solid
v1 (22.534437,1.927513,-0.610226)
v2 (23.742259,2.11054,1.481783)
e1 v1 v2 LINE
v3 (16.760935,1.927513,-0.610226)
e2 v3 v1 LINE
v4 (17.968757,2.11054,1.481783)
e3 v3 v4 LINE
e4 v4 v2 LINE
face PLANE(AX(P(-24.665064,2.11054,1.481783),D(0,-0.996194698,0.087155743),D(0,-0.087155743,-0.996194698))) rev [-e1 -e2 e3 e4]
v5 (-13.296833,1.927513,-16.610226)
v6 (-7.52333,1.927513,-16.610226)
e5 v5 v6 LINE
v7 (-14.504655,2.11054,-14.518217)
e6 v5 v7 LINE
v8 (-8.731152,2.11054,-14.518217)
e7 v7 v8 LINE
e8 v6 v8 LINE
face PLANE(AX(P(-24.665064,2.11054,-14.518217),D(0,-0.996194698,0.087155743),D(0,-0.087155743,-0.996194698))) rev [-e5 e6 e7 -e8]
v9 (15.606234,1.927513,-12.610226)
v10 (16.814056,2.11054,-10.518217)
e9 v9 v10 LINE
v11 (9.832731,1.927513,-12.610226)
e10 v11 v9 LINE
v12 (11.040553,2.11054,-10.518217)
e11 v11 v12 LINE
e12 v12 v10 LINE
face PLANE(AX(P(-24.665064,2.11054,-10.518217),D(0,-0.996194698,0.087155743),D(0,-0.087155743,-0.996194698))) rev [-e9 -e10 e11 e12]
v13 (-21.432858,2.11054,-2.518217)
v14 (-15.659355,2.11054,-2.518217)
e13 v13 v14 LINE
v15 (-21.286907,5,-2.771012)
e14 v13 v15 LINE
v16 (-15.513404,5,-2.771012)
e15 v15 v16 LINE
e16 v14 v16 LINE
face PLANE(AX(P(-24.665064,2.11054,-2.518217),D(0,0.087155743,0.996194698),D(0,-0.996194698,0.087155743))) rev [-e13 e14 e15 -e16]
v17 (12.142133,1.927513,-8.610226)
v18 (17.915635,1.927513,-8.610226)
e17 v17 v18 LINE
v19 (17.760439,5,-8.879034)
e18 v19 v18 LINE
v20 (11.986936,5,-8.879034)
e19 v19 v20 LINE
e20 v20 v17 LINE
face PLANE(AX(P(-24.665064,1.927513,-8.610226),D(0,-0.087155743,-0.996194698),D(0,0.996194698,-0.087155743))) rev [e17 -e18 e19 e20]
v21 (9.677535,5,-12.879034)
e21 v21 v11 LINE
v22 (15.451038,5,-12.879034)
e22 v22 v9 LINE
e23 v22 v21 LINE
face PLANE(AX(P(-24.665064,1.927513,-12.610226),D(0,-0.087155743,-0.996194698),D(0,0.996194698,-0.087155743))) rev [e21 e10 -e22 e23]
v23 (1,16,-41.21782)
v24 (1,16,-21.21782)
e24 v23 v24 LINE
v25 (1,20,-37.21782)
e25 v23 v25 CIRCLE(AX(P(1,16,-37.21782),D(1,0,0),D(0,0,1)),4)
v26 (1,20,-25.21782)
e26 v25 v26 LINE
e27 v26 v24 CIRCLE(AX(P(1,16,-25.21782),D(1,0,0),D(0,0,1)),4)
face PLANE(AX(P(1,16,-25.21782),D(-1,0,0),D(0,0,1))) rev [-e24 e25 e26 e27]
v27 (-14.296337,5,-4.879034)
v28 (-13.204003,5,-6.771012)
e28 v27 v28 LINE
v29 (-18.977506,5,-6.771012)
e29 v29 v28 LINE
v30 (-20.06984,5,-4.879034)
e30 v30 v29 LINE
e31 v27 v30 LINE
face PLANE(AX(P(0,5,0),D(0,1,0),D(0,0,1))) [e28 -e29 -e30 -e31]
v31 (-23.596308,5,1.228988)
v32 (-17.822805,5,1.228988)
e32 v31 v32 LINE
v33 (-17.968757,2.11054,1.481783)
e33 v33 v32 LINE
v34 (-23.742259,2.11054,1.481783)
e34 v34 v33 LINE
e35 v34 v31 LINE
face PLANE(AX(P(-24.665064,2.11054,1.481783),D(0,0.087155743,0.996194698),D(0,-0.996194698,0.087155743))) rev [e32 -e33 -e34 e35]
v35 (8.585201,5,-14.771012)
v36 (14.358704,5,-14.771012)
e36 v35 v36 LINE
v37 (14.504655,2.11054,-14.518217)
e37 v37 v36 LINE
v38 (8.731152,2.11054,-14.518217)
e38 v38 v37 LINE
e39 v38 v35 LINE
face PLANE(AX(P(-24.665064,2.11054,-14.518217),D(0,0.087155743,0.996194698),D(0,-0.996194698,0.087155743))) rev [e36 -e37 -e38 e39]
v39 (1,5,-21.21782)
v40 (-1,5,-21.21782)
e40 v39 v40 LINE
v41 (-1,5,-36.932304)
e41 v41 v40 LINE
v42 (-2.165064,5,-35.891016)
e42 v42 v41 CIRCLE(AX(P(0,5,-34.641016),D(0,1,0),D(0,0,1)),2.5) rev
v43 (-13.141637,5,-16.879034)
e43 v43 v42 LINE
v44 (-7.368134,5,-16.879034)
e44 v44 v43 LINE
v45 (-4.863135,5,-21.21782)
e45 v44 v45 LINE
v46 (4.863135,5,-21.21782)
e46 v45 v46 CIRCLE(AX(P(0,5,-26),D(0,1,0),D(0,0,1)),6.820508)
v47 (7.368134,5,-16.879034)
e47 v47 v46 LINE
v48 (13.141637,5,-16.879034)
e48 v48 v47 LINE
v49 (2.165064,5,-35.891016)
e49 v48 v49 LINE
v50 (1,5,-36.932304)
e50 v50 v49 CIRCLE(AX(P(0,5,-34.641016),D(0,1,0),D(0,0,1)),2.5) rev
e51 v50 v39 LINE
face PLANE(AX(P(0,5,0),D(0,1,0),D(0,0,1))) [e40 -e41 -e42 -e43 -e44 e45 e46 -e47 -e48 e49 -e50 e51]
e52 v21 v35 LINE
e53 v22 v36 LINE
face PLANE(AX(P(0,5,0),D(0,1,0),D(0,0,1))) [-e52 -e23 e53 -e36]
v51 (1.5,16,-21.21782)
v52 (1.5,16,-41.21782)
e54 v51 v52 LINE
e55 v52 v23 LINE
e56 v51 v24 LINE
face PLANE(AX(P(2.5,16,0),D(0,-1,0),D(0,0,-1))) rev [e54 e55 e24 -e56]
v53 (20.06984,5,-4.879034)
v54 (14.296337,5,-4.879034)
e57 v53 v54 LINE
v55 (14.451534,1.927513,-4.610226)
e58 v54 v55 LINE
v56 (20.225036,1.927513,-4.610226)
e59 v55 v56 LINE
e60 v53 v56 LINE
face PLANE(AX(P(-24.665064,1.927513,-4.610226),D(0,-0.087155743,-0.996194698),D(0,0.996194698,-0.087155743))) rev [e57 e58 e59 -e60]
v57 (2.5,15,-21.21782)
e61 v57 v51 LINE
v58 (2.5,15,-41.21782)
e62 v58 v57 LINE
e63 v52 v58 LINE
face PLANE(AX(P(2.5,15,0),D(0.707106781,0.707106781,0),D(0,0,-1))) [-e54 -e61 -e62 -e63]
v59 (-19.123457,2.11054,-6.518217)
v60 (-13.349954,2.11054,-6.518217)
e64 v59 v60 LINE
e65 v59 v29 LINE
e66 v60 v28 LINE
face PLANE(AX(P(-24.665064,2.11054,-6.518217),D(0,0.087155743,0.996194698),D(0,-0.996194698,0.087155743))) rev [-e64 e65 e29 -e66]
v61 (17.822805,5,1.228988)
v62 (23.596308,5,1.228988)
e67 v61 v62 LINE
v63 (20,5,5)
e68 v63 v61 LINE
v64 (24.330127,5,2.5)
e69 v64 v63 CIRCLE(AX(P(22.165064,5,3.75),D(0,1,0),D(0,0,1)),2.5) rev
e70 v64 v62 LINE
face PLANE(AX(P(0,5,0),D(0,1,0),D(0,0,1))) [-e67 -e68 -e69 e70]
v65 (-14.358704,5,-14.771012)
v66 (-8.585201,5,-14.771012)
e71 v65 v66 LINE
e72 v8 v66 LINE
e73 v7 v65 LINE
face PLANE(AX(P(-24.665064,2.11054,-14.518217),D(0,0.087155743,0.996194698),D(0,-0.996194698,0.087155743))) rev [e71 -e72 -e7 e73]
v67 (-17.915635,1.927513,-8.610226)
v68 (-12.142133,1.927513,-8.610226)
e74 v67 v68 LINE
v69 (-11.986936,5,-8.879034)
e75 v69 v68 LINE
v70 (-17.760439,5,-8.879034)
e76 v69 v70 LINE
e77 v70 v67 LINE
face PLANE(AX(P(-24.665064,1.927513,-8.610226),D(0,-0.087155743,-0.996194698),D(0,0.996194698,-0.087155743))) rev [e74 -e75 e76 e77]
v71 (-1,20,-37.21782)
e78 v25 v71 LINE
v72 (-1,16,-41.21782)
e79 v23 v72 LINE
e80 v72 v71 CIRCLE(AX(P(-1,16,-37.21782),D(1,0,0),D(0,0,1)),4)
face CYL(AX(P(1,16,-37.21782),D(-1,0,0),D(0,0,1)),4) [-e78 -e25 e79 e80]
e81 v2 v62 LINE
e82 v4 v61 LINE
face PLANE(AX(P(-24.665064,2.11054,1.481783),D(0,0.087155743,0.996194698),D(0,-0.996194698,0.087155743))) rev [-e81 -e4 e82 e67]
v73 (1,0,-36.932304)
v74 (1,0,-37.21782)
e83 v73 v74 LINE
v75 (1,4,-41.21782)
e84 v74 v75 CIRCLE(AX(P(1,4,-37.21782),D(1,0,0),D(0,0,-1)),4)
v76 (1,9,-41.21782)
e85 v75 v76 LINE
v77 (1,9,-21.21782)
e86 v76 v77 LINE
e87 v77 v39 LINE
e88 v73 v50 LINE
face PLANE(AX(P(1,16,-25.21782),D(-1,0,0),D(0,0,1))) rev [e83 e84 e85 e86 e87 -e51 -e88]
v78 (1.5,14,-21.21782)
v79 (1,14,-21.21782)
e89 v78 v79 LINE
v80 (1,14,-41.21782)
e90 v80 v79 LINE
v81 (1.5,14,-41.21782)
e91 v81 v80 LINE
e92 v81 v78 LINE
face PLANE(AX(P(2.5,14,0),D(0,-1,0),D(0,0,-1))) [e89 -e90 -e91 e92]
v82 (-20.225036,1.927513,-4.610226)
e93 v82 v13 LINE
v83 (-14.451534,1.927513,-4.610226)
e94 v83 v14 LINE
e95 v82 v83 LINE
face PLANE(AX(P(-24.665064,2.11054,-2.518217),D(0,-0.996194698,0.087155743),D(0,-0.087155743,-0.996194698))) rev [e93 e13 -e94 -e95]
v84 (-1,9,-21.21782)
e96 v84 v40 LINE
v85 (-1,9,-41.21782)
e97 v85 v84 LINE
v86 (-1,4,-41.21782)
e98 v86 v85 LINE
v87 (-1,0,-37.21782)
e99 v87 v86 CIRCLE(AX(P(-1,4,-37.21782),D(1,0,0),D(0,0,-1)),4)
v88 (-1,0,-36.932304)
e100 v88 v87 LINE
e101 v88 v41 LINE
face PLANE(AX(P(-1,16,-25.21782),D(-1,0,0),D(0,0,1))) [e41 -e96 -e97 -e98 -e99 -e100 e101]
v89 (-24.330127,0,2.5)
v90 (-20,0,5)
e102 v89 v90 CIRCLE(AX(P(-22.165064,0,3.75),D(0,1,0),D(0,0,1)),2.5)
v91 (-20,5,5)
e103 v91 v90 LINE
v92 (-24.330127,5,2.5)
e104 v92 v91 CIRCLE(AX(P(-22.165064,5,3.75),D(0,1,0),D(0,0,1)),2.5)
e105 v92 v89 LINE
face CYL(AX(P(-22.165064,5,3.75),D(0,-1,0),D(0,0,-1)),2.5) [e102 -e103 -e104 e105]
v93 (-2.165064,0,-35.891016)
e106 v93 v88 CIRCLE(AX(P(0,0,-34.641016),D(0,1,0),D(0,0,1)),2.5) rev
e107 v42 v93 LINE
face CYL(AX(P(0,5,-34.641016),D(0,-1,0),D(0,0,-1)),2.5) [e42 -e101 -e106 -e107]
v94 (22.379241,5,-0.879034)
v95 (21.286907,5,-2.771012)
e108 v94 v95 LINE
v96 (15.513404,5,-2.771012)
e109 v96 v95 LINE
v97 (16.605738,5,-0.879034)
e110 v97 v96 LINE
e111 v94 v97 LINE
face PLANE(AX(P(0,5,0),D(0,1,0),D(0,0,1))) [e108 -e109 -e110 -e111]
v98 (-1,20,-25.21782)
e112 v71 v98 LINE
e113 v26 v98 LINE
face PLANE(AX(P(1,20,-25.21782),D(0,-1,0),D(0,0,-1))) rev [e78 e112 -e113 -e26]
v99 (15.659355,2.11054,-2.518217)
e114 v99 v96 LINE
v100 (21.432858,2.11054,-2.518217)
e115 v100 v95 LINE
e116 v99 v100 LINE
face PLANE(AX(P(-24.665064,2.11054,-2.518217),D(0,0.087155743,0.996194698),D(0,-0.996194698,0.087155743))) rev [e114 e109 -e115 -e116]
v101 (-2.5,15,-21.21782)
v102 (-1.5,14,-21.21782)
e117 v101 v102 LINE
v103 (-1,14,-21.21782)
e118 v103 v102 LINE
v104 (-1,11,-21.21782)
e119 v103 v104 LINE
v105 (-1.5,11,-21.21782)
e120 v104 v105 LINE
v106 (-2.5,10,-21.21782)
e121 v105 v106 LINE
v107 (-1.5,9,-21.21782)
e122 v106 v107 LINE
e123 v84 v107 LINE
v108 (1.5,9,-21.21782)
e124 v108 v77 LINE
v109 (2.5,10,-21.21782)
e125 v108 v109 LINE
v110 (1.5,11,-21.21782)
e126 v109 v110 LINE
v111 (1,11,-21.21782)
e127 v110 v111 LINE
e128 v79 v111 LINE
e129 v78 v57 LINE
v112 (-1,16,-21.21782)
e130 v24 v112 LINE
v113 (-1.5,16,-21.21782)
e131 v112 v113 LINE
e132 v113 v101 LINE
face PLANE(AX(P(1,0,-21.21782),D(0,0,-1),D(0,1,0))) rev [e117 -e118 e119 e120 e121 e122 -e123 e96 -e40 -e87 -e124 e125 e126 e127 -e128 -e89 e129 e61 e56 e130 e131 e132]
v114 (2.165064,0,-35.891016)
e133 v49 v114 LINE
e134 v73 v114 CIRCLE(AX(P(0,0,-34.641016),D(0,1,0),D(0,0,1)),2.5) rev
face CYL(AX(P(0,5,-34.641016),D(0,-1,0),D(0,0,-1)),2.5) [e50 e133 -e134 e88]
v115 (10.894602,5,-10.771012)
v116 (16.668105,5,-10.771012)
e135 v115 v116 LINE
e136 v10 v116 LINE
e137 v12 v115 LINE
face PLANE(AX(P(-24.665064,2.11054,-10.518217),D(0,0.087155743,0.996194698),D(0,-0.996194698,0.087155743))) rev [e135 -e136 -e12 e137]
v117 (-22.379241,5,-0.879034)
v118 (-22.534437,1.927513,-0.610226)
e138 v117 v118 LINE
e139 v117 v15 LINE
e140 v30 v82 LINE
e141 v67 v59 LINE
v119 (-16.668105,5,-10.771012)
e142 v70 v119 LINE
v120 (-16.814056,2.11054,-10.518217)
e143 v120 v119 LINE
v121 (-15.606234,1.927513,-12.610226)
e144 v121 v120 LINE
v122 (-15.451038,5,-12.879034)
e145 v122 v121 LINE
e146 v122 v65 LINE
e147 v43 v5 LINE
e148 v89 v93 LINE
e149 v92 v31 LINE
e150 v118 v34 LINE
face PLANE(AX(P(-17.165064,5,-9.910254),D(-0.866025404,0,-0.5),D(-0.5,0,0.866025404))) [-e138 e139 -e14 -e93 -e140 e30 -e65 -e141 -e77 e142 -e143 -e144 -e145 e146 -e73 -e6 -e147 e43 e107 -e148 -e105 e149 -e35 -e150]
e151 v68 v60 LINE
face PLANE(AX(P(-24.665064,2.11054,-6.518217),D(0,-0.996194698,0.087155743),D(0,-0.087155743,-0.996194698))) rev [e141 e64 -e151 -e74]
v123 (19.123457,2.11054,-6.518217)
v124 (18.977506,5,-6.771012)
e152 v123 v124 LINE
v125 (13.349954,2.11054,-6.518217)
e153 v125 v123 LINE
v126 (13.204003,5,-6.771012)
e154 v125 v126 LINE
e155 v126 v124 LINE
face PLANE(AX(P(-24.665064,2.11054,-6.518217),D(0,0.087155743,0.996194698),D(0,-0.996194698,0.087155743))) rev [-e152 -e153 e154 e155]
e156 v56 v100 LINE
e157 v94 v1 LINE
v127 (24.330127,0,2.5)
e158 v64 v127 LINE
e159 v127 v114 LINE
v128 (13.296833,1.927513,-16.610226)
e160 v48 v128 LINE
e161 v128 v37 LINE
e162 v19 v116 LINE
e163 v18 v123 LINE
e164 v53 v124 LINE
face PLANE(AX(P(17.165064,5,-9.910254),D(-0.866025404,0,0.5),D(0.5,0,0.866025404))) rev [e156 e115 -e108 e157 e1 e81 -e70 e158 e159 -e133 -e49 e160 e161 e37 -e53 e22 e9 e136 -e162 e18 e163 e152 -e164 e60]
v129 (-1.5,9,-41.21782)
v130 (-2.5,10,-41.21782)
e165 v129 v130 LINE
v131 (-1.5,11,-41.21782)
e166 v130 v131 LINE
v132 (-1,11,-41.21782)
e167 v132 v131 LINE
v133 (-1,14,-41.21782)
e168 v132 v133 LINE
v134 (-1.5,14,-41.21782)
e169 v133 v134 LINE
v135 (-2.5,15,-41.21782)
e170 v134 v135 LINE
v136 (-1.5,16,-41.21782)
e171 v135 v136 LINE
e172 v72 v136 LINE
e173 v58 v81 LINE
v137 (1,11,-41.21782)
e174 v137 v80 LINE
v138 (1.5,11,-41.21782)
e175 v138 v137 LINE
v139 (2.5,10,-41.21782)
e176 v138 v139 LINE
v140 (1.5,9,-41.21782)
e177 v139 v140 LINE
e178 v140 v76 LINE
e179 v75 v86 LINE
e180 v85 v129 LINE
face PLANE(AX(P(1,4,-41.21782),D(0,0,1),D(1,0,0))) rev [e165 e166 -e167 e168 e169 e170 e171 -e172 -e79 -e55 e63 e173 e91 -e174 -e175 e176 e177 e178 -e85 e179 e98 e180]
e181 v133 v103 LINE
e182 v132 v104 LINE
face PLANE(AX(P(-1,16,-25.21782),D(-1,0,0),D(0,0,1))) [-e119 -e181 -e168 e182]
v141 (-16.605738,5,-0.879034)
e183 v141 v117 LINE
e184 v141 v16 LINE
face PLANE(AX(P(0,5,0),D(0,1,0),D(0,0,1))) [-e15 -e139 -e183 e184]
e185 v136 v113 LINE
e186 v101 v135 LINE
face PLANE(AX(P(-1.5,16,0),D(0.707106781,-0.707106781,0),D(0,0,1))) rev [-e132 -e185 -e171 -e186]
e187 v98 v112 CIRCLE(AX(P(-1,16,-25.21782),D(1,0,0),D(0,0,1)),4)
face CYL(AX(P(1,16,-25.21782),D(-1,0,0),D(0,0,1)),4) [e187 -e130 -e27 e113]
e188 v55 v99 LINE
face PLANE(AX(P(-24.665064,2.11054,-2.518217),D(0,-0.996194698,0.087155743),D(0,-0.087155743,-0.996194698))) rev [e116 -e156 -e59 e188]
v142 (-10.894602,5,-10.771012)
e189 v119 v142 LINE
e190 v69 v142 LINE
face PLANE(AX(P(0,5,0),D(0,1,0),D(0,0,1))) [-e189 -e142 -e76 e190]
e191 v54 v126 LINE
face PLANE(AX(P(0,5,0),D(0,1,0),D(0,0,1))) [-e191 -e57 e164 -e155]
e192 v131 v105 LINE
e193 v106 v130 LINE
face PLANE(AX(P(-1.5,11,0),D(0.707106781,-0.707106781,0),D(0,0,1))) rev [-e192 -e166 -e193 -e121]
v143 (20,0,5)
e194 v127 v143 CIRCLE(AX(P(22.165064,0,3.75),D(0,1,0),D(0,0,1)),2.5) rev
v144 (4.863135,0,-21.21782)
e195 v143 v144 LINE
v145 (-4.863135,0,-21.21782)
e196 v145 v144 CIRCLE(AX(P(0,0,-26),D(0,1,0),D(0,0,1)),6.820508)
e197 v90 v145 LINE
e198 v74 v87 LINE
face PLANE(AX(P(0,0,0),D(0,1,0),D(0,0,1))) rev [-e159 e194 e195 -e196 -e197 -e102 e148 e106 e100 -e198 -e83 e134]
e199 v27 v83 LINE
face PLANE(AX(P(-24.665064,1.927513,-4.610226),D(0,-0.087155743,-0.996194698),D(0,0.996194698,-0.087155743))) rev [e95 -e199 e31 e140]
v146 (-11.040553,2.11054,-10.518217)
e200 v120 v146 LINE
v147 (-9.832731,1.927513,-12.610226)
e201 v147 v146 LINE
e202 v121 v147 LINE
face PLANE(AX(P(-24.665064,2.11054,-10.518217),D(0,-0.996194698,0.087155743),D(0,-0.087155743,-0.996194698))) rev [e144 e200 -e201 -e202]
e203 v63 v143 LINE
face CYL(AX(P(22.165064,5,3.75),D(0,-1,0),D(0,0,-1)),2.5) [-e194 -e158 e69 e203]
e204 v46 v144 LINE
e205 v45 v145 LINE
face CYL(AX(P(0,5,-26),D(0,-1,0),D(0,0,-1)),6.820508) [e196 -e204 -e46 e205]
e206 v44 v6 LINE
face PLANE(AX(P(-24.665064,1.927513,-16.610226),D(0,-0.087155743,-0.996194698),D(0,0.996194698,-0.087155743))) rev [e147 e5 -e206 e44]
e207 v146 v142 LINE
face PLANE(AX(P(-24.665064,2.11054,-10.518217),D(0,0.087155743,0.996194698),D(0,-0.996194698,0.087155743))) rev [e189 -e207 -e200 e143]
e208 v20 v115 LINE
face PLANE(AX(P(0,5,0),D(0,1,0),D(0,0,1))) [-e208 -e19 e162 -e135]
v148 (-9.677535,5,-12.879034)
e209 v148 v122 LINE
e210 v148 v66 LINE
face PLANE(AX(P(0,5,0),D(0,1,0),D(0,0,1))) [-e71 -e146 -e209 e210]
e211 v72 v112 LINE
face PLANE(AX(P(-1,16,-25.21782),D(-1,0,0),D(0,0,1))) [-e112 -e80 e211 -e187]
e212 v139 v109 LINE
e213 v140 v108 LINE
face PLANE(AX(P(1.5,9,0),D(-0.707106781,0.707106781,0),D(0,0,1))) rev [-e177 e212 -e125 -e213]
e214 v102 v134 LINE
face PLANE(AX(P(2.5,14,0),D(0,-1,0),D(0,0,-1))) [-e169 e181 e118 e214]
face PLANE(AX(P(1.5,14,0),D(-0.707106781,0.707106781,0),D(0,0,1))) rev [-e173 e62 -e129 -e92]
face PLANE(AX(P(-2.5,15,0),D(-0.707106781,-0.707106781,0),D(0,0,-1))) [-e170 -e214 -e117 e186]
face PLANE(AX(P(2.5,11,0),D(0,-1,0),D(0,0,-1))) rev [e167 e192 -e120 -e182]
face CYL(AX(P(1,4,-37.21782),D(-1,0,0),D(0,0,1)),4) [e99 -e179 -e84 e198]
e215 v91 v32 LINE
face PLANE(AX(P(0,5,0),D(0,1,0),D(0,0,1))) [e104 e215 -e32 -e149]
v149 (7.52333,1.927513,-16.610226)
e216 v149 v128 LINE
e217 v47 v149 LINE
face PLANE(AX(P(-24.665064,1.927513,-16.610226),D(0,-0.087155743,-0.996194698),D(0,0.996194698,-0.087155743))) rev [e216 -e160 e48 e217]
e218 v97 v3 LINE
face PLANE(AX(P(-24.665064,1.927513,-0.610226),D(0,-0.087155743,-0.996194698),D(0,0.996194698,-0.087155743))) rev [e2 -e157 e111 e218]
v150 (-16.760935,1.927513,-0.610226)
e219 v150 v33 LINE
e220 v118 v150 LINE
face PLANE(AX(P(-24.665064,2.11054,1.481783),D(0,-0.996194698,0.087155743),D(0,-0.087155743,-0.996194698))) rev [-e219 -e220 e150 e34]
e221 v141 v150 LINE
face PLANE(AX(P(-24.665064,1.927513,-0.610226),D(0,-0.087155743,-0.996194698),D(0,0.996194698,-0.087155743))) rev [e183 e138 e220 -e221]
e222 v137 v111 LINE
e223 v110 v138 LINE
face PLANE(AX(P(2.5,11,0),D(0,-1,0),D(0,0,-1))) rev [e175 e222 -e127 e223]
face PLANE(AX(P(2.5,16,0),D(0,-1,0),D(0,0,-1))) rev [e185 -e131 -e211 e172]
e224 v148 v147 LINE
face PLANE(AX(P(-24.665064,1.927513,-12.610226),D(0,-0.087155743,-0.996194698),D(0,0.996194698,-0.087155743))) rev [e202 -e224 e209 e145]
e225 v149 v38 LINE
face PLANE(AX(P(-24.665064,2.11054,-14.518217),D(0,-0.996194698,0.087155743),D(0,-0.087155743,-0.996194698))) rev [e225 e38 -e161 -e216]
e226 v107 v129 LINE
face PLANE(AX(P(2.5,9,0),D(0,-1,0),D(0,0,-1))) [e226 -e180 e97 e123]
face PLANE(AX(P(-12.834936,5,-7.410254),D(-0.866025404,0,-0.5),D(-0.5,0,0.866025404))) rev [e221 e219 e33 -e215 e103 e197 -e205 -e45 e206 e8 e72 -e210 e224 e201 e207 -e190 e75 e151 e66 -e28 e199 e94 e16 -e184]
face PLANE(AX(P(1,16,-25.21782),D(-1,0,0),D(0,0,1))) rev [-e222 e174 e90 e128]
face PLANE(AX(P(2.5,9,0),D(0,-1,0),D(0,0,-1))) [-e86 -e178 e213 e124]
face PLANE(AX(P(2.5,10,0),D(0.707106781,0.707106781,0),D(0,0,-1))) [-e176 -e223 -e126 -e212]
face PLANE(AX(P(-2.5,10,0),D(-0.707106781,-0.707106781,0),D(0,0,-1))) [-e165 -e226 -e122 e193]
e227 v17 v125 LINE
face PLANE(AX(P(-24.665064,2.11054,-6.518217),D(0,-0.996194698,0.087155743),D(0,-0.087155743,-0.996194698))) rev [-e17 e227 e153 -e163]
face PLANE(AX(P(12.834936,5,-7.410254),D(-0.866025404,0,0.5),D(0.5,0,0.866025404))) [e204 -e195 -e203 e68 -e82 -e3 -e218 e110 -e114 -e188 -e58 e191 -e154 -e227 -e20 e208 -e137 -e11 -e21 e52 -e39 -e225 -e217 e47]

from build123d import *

# Parameters (mm, degrees)
BASE_DEPTH           = 5
BOARDSLOT_DEPTH      = 45.86446744
BOARDSLOT_DEPTH_BACK = 45.86446744
SUPPORTMOUNT_DEPTH   = 5
BOSS_EXTRUDE1_DEPTH  = 1
SKETCH10_W           = 20
SKETCH10_H           = 2
BOSS_EXTRUDE2_DEPTH  = 2.5
CHAMFER1_SIZE        = 1


with BuildPart() as part:
    # Sketch1 → Base (new body)
    with BuildSketch(Plane(origin=(0, 0, 0), x_dir=(1, 0, 0), z_dir=(0, 1, 0))):
        with BuildLine():
            Line((-24.330127019, -2.5), (-2.165063509, 35.891016151))
            ThreePointArc((-2.165063509, 35.891016151), (0, 37.141016151), (2.165063509, 35.891016151))
            Line((2.165063509, 35.891016151), (24.330127019, -2.5))
            ThreePointArc((24.330127019, -2.5), (23.415063509, -5.915063509), (20, -5))
            Line((20, -5), (2.165063509, 25.891016151))
            ThreePointArc((2.165063509, 25.891016151), (0, 27.141016151), (-2.165063509, 25.891016151))
            Line((-2.165063509, 25.891016151), (-20, -5))
            ThreePointArc((-20, -5), (-23.415063509, -5.915063509), (-24.330127019, -2.5))
        make_face()
    extrude(amount=BASE_DEPTH)

    # Sketch2 → BoardSlot (cut, two sides: drawn at the far end of the back side and taken through both)
    with BuildSketch(Plane(origin=(0, 0, 0), x_dir=(0, 0, -1), z_dir=(1, 0, 0)).offset(-BOARDSLOT_DEPTH_BACK)):
        Polygon((-1.481783147, 2.110540039), (-0.610225719, 12.07248702), (1.481783147, 11.889459961), (0.610225719, 1.92751298), align=None)
        Polygon((3.389774281, 12.07248702), (5.481783147, 11.889459961), (4.610225719, 1.92751298), (2.518216853, 2.110540039), align=None)
        Polygon((7.389774281, 12.07248702), (9.481783147, 11.889459961), (8.610225719, 1.92751298), (6.518216853, 2.110540039), align=None)
        Polygon((11.389774281, 12.07248702), (13.481783147, 11.889459961), (12.610225719, 1.92751298), (10.518216853, 2.110540039), align=None)
        Polygon((15.389774281, 12.07248702), (17.481783147, 11.889459961), (16.610225719, 1.92751298), (14.518216853, 2.110540039), align=None)
    extrude(amount=BOARDSLOT_DEPTH + BOARDSLOT_DEPTH_BACK, mode=Mode.SUBTRACT)

    # Sketch3 → SupportMount (add)
    with BuildSketch(Plane(origin=(0, 0, 0), x_dir=(1, 0, 0), z_dir=(0, 1, 0))):
        with BuildLine():
            Line((5.906733437, 29.410253733), (2.165063509, 35.891016151))
            ThreePointArc((2.165063509, 35.891016151), (0, 37.141016151), (-2.165063509, 35.891016151))
            Line((-2.165063509, 35.891016151), (-5.906733437, 29.410253733))
            ThreePointArc((-5.906733437, 29.410253733), (0, 19.179491924), (5.906733437, 29.410253733))
        make_face()
    extrude(amount=SUPPORTMOUNT_DEPTH)

    # Sketch9 → Boss-Extrude1 (add, symmetric)
    with BuildSketch(Plane(origin=(0, 0, 0), x_dir=(0, 0, -1), z_dir=(1, 0, 0))):
        with BuildLine():
            Line((21.217819535, 0), (37.217819535, 0))
            ThreePointArc((37.217819535, 0), (40.04624666, 1.171572875), (41.217819535, 4))
            Line((41.217819535, 4), (41.217819535, 16))
            ThreePointArc((41.217819535, 16), (40.04624666, 18.828427125), (37.217819535, 20))
            Line((37.217819535, 20), (25.217819535, 20))
            ThreePointArc((25.217819535, 20), (22.38939241, 18.828427125), (21.217819535, 16))
            Line((21.217819535, 16), (21.217819535, 0))
        make_face()
    extrude(amount=BOSS_EXTRUDE1_DEPTH, both=True)

    # Sketch10 → Boss-Extrude2 (add, symmetric)
    with BuildSketch(Plane(origin=(0, 0, 0), x_dir=(0, 0, -1), z_dir=(1, 0, 0))):
        with Locations((31.217819535, 15)):
            Rectangle(SKETCH10_W, SKETCH10_H)
        with Locations((31.217819535, 10)):
            Rectangle(SKETCH10_W, SKETCH10_H)
    extrude(amount=BOSS_EXTRUDE2_DEPTH, both=True)

    # Chamfer1
    chamfer1_edges = [part.edges().sort_by_distance(p)[0] for p in [
        (-2.5, 9, -31.217819535),
        (-2.5, 11, -31.217819535),
        (-2.5, 14, -31.217819535),
        (-2.5, 16, -31.217819535),
        (2.5, 9, -31.217819535),
        (2.5, 11, -31.217819535),
        (2.5, 14, -31.217819535),
        (2.5, 16, -31.217819535),
    ]]
    chamfer(chamfer1_edges, length=CHAMFER1_SIZE - 0.0001)  # a hair under: the kernel refuses the full size


solid = part.part
